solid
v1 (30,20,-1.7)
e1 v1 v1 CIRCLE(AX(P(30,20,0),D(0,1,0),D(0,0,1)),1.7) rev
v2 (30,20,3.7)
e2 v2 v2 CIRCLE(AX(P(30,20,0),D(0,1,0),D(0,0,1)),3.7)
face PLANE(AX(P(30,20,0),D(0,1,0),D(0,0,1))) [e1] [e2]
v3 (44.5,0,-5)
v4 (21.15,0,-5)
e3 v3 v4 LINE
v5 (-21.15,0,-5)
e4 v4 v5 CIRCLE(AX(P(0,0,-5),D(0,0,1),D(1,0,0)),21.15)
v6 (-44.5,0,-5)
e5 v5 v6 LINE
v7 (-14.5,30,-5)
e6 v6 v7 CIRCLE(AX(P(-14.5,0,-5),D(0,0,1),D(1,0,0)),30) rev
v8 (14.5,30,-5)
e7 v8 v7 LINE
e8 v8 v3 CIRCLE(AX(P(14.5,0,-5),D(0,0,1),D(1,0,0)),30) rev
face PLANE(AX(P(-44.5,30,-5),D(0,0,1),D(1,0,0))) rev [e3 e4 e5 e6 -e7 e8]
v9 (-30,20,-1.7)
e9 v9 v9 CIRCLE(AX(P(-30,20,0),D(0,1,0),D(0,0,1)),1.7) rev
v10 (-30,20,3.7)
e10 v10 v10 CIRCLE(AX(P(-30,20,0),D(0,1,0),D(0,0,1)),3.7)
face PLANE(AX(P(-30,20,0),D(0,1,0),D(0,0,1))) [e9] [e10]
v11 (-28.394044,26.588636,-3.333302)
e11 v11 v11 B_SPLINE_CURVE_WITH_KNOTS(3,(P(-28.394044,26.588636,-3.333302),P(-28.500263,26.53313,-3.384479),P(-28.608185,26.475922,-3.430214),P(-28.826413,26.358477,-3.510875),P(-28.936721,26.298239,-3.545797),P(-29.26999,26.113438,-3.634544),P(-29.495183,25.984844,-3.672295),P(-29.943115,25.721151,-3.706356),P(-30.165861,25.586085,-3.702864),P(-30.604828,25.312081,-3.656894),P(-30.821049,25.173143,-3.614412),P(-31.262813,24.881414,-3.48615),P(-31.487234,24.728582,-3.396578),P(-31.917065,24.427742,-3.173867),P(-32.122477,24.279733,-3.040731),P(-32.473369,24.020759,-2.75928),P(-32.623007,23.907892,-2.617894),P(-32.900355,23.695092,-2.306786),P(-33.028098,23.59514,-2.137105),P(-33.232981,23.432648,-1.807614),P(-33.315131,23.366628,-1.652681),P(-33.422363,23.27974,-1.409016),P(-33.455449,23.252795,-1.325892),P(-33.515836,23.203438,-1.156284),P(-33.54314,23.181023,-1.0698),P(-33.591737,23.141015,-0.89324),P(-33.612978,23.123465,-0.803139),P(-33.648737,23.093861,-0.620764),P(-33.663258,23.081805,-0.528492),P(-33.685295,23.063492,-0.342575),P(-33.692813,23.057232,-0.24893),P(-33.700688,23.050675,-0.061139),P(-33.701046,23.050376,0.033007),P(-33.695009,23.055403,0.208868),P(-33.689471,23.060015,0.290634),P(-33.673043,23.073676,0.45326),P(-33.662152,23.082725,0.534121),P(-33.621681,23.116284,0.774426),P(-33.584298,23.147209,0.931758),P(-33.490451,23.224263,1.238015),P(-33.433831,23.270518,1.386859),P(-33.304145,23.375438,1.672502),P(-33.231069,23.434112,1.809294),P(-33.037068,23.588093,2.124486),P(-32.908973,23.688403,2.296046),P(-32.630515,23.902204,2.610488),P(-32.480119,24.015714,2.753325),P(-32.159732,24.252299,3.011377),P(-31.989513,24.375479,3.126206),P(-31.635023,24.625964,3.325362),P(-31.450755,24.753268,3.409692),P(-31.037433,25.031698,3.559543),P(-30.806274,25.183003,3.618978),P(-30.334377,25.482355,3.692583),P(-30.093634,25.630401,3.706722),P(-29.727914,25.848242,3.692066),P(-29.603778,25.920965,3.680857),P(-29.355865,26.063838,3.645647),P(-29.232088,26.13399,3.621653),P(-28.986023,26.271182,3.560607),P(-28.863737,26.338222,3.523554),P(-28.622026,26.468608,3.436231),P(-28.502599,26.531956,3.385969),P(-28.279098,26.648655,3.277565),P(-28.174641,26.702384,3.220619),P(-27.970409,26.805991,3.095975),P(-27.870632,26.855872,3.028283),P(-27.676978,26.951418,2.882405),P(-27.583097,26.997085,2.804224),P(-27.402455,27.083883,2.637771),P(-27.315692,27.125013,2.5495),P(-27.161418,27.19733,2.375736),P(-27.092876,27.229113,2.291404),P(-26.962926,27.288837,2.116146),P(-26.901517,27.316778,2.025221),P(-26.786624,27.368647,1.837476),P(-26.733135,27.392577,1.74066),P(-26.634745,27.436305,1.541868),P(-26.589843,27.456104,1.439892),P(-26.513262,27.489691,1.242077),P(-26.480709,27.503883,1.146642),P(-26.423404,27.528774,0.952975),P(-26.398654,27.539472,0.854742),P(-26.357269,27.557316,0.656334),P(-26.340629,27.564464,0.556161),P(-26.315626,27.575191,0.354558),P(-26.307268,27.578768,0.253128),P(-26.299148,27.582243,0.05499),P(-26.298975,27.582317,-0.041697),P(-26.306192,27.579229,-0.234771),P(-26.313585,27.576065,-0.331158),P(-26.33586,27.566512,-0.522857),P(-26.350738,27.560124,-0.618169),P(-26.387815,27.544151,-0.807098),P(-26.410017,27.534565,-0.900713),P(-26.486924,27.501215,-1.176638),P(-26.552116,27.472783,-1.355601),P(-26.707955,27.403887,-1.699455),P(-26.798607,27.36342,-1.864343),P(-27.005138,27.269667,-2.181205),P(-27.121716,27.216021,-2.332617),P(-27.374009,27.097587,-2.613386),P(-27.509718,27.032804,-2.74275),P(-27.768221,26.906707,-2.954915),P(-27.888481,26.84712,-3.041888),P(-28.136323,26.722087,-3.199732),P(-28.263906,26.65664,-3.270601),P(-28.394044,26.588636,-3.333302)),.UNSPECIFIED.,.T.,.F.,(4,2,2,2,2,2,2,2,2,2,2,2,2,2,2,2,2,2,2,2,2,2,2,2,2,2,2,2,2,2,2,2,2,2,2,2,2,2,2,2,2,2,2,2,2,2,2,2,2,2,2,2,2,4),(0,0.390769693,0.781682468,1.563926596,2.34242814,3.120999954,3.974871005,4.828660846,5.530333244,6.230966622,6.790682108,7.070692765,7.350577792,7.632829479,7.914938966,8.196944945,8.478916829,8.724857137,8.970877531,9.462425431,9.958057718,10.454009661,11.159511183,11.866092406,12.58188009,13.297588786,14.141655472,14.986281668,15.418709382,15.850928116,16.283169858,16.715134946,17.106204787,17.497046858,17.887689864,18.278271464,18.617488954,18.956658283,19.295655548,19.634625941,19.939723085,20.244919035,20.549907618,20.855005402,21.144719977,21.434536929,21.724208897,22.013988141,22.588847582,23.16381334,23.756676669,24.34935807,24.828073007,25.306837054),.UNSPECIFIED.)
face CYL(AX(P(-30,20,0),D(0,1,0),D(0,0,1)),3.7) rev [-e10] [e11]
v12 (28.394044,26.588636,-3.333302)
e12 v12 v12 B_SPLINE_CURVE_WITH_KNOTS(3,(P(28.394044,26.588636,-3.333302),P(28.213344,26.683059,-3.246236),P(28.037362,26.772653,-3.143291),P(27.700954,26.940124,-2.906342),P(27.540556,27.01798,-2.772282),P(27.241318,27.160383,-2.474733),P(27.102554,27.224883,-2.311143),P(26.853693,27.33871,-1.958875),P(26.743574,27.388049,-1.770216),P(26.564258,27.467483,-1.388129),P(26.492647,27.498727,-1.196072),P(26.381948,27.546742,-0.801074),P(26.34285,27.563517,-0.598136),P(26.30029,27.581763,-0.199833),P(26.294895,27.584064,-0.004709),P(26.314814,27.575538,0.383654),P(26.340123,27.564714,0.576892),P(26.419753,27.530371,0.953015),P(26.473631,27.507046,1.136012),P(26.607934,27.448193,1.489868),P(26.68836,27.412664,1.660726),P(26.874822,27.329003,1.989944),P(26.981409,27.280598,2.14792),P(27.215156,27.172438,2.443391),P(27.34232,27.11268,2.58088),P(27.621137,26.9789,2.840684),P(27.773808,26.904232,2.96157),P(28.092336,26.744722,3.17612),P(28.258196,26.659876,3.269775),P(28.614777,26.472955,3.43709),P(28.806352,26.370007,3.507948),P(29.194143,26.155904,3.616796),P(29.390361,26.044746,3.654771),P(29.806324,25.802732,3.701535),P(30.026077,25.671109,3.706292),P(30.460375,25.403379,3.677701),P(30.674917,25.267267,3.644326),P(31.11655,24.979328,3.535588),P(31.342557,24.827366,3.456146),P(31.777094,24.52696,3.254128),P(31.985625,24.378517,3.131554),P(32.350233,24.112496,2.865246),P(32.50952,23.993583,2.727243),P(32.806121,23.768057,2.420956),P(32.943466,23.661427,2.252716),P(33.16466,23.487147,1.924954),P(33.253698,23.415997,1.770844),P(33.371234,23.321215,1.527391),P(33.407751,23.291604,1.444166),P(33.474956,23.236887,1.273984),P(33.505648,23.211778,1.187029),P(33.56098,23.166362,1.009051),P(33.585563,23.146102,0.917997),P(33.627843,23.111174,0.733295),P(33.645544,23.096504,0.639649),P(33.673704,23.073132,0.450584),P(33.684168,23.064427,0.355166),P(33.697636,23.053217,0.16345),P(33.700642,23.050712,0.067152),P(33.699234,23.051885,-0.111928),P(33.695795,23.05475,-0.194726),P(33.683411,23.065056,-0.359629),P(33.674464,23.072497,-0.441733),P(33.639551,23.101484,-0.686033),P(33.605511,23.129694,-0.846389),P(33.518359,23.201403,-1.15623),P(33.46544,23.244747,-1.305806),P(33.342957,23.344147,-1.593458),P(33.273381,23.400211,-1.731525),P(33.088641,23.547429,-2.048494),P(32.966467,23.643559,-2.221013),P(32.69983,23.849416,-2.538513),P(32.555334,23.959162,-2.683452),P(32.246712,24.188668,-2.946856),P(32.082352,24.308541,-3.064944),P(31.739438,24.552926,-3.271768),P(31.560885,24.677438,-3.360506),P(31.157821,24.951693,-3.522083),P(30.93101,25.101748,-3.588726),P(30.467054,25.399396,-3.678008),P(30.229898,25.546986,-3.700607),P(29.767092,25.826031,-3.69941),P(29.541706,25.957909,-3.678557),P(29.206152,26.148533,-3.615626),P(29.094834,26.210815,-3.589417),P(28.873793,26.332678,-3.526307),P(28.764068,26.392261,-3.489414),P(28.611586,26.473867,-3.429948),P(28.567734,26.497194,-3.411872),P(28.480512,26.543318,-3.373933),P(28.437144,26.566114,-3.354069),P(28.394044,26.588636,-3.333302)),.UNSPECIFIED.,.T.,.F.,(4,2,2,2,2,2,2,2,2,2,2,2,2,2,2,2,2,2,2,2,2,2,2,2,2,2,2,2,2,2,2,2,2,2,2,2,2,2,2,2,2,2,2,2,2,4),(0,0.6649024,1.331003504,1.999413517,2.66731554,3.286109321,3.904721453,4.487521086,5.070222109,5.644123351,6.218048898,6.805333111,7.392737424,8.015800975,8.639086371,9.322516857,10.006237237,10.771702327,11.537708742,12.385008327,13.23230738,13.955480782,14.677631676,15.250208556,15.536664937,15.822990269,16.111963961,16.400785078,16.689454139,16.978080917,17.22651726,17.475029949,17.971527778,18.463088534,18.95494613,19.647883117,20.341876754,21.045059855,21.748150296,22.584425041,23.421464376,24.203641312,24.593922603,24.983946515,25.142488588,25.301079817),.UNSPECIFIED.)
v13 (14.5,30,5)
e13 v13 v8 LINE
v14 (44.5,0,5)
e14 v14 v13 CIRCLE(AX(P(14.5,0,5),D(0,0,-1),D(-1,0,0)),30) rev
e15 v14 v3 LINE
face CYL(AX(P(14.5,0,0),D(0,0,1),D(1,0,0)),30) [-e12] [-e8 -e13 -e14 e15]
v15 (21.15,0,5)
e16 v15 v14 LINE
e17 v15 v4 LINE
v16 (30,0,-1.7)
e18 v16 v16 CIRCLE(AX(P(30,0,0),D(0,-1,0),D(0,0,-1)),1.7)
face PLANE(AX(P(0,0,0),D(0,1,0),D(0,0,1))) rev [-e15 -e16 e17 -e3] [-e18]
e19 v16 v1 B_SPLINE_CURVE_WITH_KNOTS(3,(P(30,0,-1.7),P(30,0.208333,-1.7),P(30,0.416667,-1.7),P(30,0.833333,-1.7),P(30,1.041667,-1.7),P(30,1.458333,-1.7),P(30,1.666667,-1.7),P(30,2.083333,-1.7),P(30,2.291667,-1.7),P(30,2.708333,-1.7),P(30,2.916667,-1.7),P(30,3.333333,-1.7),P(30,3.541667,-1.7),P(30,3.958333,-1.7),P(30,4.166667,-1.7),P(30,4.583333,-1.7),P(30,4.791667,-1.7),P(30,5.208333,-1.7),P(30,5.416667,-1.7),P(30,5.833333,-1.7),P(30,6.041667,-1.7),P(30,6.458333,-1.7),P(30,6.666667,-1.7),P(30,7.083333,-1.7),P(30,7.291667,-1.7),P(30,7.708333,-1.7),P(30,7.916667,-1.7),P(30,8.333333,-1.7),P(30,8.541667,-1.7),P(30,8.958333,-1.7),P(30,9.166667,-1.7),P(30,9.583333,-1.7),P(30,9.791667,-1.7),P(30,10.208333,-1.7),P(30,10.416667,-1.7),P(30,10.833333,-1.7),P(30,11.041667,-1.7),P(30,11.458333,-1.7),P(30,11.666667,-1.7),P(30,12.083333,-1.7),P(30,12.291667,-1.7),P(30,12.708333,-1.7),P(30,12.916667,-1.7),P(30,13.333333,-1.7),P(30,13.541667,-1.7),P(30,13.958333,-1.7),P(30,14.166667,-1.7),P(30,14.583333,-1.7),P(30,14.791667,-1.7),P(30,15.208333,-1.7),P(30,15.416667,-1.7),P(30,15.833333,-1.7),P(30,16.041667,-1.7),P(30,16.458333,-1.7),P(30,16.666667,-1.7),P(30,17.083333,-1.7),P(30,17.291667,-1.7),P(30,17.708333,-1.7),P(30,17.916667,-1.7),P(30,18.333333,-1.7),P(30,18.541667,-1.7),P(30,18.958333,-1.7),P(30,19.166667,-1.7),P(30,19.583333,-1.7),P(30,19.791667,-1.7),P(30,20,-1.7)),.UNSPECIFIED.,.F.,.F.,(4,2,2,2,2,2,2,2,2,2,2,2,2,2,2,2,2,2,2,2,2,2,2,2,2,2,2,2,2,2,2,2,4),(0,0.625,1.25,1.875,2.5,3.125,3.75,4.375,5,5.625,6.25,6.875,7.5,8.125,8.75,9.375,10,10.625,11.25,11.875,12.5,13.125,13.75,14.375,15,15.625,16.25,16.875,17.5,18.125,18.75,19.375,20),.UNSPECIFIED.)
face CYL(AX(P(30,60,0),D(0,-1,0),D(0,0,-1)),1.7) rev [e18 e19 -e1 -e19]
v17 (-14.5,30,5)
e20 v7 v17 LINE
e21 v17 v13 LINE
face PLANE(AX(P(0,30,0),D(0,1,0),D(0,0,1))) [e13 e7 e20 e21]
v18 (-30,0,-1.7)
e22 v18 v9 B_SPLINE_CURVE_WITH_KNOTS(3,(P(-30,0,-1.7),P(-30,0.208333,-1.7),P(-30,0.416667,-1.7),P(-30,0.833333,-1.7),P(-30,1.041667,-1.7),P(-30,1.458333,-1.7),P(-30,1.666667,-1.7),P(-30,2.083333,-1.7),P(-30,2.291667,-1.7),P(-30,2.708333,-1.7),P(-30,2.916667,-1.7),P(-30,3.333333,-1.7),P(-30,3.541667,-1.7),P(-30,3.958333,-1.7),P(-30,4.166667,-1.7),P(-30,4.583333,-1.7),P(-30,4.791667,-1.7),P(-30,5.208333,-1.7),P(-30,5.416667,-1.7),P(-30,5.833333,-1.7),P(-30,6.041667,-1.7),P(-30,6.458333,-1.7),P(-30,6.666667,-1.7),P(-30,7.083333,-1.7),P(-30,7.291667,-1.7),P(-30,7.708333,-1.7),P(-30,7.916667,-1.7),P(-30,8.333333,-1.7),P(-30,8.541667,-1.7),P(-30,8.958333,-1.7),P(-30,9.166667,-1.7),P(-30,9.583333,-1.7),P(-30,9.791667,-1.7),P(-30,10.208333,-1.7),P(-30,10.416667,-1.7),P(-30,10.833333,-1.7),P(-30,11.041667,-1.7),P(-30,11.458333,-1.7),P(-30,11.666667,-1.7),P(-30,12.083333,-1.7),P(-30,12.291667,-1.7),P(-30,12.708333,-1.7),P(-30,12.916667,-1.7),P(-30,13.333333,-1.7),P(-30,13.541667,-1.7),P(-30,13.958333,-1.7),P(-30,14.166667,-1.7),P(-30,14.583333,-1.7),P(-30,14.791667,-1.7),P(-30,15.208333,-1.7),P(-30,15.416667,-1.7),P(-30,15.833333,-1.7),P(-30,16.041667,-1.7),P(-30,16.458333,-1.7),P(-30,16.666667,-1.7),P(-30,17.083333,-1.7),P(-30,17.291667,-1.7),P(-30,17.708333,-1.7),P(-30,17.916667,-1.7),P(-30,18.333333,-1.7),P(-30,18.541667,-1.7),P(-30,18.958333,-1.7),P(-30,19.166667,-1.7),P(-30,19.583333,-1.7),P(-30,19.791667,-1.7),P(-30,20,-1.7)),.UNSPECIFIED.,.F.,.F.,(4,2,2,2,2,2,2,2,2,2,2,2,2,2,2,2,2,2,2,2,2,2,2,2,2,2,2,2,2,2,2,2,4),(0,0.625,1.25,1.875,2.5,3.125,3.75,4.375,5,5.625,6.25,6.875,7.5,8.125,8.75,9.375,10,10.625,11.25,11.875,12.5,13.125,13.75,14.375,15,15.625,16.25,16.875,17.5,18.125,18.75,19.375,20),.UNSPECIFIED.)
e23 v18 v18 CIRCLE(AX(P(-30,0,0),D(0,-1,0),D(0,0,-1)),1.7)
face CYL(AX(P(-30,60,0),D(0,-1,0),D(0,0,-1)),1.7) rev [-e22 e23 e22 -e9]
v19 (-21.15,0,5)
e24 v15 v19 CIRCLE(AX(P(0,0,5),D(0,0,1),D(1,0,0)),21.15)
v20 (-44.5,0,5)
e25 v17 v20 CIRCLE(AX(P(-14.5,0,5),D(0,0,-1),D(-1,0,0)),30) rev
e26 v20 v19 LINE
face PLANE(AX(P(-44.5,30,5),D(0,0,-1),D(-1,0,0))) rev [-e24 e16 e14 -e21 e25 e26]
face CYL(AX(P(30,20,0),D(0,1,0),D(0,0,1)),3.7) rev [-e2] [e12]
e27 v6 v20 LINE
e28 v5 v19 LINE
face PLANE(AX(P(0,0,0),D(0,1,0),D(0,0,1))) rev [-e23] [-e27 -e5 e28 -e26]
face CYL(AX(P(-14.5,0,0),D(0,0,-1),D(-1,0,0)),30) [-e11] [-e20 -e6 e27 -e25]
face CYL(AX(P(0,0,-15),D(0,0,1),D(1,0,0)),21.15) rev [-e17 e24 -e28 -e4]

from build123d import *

# Parameters (mm, degrees)
SKETCH_1_W          = 89
SKETCH_1_H          = 10
EXTRUDE_1_DEPTH     = 30
SKETCH_2_R          = 21.15
CUT_EXTRUDE_1_DEPTH = 20
SKETCH_3_R          = 1.7
CUT_EXTRUDE_2_DEPTH = 60
SKETCH_4_R          = 3.7
CUT_EXTRUDE_3_DEPTH = 10
FILLET_START        = -5
FILLET_1_DEPTH      = 10


with BuildPart() as part:
    # 草图1 → 凸台-拉伸1 (new body)
    with BuildSketch(Plane(origin=(0, 0, 0), x_dir=(1, 0, 0), z_dir=(0, 1, 0))):
        Rectangle(SKETCH_1_W, SKETCH_1_H)
    extrude(amount=EXTRUDE_1_DEPTH)

    # 草图2 → 切除-拉伸1 (cut)
    with BuildSketch(Plane.XY.offset(5)):
        Circle(SKETCH_2_R)
    extrude(amount=-CUT_EXTRUDE_1_DEPTH, mode=Mode.SUBTRACT)

    # 草图3 → 切除-拉伸2 (cut)
    with BuildSketch(Plane.XZ):
        with Locations(Location((-30, 0, 0), (0, 0, 270))):
            Circle(SKETCH_3_R)
        with Locations(Location((30, 0, 0), (0, 0, 270))):
            Circle(SKETCH_3_R)
    extrude(amount=-CUT_EXTRUDE_2_DEPTH, mode=Mode.SUBTRACT)

    # 草图4 → 切除-拉伸3 (cut)
    with BuildSketch(Plane(origin=(0, 30, 0), x_dir=(1, 0, 0), z_dir=(0, 1, 0))):
        with Locations(Location((-30, 0, 0), (0, 0, 270))):
            Circle(SKETCH_4_R)
        with Locations(Location((30, 0, 0), (0, 0, 270))):
            Circle(SKETCH_4_R)
    extrude(amount=-CUT_EXTRUDE_3_DEPTH, mode=Mode.SUBTRACT)

    # 圆角1: read off the stored shape, not the designer's step
    # 圆角1 outline → 圆角1 (cut)
    with BuildSketch(Plane.XY.offset(FILLET_START)):
        with BuildLine():
            ThreePointArc((-44.5, 0), (-35.713203436, 21.213203436), (-14.5, 30))
            Line((-14.5, 30), (-44.5, 30))
            Line((-44.5, 30), (-44.5, 0))
        make_face()
        with BuildLine():
            ThreePointArc((14.5, 30), (35.713203436, 21.213203436), (44.5, 0))
            Line((44.5, 0), (44.5, 30))
            Line((44.5, 30), (14.5, 30))
        make_face()
    extrude(amount=FILLET_1_DEPTH, mode=Mode.SUBTRACT)


solid = part.part
